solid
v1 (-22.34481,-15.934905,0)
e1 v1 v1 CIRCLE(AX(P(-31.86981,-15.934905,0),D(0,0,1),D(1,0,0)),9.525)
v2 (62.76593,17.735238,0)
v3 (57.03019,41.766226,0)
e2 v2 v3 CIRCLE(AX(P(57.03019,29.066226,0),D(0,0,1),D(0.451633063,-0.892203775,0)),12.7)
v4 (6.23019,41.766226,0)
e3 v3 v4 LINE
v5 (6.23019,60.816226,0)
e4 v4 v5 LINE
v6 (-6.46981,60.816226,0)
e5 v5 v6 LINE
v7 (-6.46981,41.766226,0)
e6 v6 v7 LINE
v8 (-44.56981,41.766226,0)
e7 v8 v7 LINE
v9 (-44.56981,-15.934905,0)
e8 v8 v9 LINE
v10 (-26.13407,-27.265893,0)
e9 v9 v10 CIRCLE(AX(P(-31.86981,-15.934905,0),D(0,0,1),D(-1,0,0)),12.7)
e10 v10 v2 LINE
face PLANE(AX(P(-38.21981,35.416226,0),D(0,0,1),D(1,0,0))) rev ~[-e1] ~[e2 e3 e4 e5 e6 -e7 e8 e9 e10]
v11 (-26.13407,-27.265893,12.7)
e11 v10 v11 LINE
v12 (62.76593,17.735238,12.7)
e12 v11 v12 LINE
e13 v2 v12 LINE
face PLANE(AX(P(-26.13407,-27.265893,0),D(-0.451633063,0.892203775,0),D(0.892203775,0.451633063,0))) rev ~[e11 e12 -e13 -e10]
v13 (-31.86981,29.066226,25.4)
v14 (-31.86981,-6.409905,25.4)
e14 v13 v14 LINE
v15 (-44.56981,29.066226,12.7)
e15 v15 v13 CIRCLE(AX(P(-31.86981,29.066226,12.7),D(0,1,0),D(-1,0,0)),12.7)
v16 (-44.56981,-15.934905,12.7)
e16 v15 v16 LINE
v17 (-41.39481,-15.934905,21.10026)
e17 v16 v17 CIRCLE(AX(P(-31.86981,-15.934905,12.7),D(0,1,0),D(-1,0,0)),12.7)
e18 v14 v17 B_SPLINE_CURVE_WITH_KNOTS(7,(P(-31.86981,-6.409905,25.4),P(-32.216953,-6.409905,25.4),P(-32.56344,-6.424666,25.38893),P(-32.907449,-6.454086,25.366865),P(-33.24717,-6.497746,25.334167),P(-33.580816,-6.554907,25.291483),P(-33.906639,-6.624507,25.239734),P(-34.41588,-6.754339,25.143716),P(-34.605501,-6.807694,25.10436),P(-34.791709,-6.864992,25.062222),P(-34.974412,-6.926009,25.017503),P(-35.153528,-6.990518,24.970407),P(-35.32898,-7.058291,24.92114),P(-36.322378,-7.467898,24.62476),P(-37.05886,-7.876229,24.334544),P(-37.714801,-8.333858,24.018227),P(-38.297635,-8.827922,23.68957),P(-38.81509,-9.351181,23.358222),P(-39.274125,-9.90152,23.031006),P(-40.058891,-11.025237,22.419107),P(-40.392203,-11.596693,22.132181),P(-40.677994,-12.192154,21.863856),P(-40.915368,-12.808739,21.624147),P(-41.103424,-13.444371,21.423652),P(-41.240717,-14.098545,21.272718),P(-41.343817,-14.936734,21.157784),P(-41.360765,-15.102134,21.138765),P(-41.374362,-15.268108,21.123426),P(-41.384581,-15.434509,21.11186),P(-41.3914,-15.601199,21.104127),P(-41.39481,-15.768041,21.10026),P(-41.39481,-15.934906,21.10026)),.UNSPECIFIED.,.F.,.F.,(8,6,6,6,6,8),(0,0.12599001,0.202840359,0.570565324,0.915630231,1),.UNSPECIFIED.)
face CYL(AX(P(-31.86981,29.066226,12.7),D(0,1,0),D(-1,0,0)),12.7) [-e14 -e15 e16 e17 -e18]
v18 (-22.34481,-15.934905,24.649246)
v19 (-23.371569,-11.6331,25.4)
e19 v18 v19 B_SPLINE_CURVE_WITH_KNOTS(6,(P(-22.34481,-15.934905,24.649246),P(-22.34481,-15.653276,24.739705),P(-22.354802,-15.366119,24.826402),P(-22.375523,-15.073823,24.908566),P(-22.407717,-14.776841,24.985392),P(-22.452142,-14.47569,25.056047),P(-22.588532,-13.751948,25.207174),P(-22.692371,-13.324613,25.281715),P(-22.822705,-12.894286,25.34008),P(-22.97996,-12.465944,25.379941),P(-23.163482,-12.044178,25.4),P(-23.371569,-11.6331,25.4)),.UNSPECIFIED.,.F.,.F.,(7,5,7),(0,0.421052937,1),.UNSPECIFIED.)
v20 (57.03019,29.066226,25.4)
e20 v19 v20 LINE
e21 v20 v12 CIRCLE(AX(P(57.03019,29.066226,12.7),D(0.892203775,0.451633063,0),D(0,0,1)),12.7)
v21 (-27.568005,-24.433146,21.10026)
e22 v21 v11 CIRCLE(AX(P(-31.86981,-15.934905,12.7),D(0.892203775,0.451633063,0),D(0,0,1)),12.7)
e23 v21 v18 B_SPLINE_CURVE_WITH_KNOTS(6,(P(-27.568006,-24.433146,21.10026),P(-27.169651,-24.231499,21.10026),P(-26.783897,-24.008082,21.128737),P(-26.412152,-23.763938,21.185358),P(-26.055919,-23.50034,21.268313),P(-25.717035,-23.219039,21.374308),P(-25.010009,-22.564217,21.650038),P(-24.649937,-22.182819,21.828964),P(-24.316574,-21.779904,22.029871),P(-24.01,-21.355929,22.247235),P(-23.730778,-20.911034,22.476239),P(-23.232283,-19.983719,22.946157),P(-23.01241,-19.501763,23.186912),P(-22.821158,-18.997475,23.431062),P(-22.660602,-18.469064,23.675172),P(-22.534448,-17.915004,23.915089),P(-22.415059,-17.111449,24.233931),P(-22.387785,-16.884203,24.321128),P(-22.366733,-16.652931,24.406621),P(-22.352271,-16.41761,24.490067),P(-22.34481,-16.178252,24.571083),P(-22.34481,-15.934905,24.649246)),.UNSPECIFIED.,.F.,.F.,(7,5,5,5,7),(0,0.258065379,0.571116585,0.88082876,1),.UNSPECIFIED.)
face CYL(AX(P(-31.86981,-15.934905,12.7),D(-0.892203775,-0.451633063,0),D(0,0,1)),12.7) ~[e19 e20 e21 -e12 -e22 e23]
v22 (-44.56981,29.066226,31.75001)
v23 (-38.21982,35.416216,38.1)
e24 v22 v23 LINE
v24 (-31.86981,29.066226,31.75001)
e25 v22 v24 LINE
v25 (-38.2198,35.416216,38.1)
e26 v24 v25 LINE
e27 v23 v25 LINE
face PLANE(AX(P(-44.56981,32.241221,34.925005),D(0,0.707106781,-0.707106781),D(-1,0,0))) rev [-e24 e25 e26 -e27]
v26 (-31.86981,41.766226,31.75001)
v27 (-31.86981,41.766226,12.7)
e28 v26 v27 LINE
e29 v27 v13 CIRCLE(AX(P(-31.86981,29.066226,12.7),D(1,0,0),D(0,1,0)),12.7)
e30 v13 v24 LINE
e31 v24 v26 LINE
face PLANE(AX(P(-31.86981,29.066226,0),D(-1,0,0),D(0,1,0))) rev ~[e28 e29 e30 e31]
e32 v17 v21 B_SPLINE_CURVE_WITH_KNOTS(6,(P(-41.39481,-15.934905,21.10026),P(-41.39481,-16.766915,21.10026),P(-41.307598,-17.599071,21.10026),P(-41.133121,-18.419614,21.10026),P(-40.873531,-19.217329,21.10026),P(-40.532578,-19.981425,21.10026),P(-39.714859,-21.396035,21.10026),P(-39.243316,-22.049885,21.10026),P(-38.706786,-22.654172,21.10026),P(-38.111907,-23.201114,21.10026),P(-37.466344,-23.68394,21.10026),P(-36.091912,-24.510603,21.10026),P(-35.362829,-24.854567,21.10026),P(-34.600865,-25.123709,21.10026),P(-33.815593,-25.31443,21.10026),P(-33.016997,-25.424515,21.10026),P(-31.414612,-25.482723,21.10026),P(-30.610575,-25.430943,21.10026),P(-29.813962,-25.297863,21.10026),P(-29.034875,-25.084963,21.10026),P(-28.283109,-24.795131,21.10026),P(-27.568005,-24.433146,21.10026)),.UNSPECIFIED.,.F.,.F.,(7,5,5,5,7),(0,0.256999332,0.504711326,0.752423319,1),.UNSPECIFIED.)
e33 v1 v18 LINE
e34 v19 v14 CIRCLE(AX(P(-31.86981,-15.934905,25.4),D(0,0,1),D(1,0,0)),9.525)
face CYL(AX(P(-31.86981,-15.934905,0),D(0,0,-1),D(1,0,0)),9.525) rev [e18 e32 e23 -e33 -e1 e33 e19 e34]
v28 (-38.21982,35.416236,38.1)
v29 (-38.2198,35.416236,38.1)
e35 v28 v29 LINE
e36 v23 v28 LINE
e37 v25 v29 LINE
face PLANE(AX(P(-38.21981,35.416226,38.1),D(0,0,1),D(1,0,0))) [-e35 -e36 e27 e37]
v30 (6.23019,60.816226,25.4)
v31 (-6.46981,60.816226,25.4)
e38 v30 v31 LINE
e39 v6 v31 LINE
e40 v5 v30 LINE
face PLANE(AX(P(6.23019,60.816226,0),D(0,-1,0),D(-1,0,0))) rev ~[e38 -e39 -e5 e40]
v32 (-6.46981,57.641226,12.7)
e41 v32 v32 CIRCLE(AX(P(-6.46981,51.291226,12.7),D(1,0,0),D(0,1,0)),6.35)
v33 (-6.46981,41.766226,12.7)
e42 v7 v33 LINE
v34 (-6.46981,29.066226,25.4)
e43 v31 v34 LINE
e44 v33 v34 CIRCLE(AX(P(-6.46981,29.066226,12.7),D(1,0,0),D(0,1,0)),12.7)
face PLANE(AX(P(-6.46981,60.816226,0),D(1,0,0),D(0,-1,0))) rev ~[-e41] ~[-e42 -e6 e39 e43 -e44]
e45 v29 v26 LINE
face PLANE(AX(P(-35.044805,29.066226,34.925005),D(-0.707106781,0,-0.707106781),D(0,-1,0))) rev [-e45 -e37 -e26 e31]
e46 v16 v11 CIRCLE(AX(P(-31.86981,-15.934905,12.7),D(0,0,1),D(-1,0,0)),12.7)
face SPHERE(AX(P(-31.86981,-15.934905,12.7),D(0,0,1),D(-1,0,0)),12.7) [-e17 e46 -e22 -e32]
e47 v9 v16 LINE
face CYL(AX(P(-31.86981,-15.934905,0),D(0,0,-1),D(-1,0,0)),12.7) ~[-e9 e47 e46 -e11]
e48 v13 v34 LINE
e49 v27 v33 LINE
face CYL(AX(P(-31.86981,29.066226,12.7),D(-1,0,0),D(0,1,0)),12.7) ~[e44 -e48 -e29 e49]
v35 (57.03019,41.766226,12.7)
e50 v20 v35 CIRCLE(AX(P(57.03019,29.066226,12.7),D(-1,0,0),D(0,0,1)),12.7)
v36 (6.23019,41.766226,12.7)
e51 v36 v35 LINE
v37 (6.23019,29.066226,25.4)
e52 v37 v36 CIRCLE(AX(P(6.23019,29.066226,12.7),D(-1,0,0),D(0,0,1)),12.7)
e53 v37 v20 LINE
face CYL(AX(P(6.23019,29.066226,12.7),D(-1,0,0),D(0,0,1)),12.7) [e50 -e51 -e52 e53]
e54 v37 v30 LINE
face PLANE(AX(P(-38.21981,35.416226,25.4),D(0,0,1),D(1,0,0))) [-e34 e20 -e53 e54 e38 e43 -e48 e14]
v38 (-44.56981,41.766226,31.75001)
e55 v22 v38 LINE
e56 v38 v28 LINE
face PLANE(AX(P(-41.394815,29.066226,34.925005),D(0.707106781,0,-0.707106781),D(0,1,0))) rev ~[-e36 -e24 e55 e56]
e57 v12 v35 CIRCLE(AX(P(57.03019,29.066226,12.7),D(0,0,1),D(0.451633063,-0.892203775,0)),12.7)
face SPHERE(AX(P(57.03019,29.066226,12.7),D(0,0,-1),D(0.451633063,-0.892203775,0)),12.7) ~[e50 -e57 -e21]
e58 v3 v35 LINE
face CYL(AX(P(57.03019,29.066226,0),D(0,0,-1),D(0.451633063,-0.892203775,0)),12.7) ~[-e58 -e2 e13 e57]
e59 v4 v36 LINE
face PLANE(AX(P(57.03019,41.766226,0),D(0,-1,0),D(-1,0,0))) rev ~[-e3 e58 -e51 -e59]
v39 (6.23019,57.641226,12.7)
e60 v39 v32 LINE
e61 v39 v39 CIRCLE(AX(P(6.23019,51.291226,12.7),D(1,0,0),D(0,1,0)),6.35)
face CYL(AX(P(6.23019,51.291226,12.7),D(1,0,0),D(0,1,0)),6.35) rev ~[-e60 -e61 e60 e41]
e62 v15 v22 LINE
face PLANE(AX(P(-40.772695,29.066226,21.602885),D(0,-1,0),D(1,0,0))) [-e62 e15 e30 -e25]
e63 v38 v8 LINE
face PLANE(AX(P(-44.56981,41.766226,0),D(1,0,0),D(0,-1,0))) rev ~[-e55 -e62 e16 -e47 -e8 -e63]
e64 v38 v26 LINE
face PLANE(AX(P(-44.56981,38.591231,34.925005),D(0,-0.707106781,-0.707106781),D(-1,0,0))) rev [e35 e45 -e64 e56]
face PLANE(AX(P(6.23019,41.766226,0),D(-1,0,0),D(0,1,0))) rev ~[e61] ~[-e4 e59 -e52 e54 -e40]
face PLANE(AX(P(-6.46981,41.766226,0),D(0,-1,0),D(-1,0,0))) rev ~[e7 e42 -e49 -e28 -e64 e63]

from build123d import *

# Parameters (mm, degrees)
F0_W         = 12.7
F0_H         = 12.7
F0_R         = 9.525
F1_DEPTH     = 25.4
F2_DEPTH     = 38.1
F3_SIZE      = 6.34999
F4_T1_DEPTH  = 50.8
F4_T3_DEPTH  = 99.6409143921
F4_T5_DEPTH  = 25.4
F4_T7_DEPTH  = 45.0011313289
F4_T10_ANGLE = 153.1514920802
F4_T12_ANGLE = 116.8485079198
F5_R         = 6.35
F6_DEPTH     = 50.8010001


# Not quite as in the source:
# - a fillet or chamfer that OpenCascade refuses, or shapes differently, is made with other operations: its cross-section is extruded or revolved along the edge and cut away or added
# - a fillet or chamfer is up to 0.001 mm smaller than in the source, because OpenCascade refuses the exact size


with BuildPart() as f1:
    # F0 (on Top) → F1 (new body)
    with BuildSketch(Plane.XY):
        with Locations((-38.2198102176, 35.4162262917)):
            Rectangle(F0_W, F0_H)
        with BuildLine():
            Line((-6.4698102176, 41.7662262917), (-31.8698102176, 41.7662262917))
            Line((-31.8698102176, 41.7662262917), (-31.8698102176, 29.0662262917))
            Line((-31.8698102176, 29.0662262917), (-44.5698102176, 29.0662262917))
            Line((-44.5698102176, 29.0662262917), (-44.5698102176, -15.9349050373))
            ThreePointArc((-44.5698102176, -15.9349050373), (-31.8698102176, -3.2349050373), (-19.1698102176, -15.9349050373))
            ThreePointArc((-19.1698102176, -15.9349050373), (-21.0500621459, -22.5849465157), (-26.1340703224, -27.2658929842))
            Line((-26.1340703224, -27.2658929842), (62.7659296776, 17.7352383447))
            ThreePointArc((62.7659296776, 17.7352383447), (69.3831964392, 32.0146540993), (57.0301897824, 41.7662262917))
            Line((57.0301897824, 41.7662262917), (6.2301897824, 41.7662262917))
            Line((6.2301897824, 41.7662262917), (6.2301897824, 60.8162262917))
            Line((6.2301897824, 60.8162262917), (-6.4698102176, 60.8162262917))
            Line((-6.4698102176, 60.8162262917), (-6.4698102176, 41.7662262917))
        make_face()
        with BuildLine():
            ThreePointArc((-19.1698102176, -15.9349050373), (-31.8698102176, -3.2349050373), (-44.5698102176, -15.9349050373))
            ThreePointArc((-44.5698102176, -15.9349050373), (-38.5198516961, -26.754653109), (-26.1340703224, -27.2658929842))
            ThreePointArc((-26.1340703224, -27.2658929842), (-21.0500621459, -22.5849465157), (-19.1698102176, -15.9349050373))
        make_face()
        with Locations((-31.8698102176, -15.9349050373)):
            Circle(F0_R, mode=Mode.SUBTRACT)
    extrude(amount=F1_DEPTH)

    # F0 (on Top) → F2 (join)
    with BuildSketch(Plane.XY):
        with Locations((-38.2198102176, 35.4162262917)):
            Rectangle(F0_W, F0_H)
    extrude(amount=F2_DEPTH)

    # F3 (size 6.35 in the source; OpenCascade refuses exactly that, so slightly less here)
    f3_edges = [f1.edges().sort_by_distance(p)[0] for p in [
        (-38.21981, 29.066226, 38.1),
        (-44.56981, 35.416226, 38.1),
        (-38.21981, 41.766226, 38.1),
        (-31.86981, 35.416226, 38.1),
    ]]
    chamfer(f3_edges, length=F3_SIZE)

    # F4: fillet of radius 12.7 on 6 edges, made by hand

    # F4_s2 → F4_t1 (cut)
    with BuildSketch(Plane.YZ.offset(6.2301897824)):
        with BuildLine():
            ThreePointArc((29.0662262917, 25.4), (38.0464824127, 21.6802561211), (41.7662262917, 12.7))
            Line((41.7662262917, 12.7), (42.0202262917, 12.7))
            Line((42.0202262917, 12.7), (42.0202262917, 25.654))
            Line((42.0202262917, 25.654), (29.0662262917, 25.654))
            Line((29.0662262917, 25.654), (29.0662262917, 25.4))
        make_face()
    extrude(amount=F4_T1_DEPTH, mode=Mode.SUBTRACT)

    # F4_s4 → F4_t3 (cut)
    with BuildSketch(Plane(origin=(-31.7901974435, -16.0921805414, 0), x_dir=(0, 0, 1), z_dir=(0.8922037754, 0.4516330626, 0))):
        with BuildLine():
            ThreePointArc((25.4, -0.1762775595), (21.6802561211, 8.8039785616), (12.7, 12.5237224405))
            Line((12.7, 12.5237224405), (12.7, 12.7777224405))
            Line((12.7, 12.7777224405), (25.654, 12.7777224405))
            Line((25.654, 12.7777224405), (25.654, -0.1762775595))
            Line((25.654, -0.1762775595), (25.4, -0.1762775595))
        make_face()
    extrude(amount=F4_T3_DEPTH, mode=Mode.SUBTRACT)

    # F4_s6 → F4_t5 (cut)
    with BuildSketch(Plane.YZ.offset(-31.8698102176)):
        with BuildLine():
            ThreePointArc((41.7662262917, 12.7), (38.0464824127, 21.6802561211), (29.0662262917, 25.4))
            Line((29.0662262917, 25.4), (29.0662262917, 25.654))
            Line((29.0662262917, 25.654), (42.0202262917, 25.654))
            Line((42.0202262917, 25.654), (42.0202262917, 12.7))
            Line((42.0202262917, 12.7), (41.7662262917, 12.7))
        make_face()
    extrude(amount=F4_T5_DEPTH, mode=Mode.SUBTRACT)

    # F4_s8 → F4_t7 (cut)
    with BuildSketch(Plane.XZ.offset(-29.0662262917)):
        with BuildLine():
            ThreePointArc((-44.5698102176, 12.7), (-40.8500663387, 21.6802561211), (-31.8698102176, 25.4))
            Line((-31.8698102176, 25.4), (-31.8698102176, 25.654))
            Line((-31.8698102176, 25.654), (-44.8238102176, 25.654))
            Line((-44.8238102176, 25.654), (-44.8238102176, 12.7))
            Line((-44.8238102176, 12.7), (-44.5698102176, 12.7))
        make_face()
    extrude(amount=F4_T7_DEPTH, mode=Mode.SUBTRACT)

    # F4_s9 → F4_t10 (revolve, cut)
    with BuildSketch(Plane(origin=(57.1098025565, 28.9089507875, 0), x_dir=(0, 0, 1), z_dir=(-0.8922037754, -0.4516330626, 0))):
        with BuildLine():
            ThreePointArc((25.4, 0.1762775595), (21.6802561211, -8.8039785616), (12.7, -12.5237224405))
            Line((12.7, -12.5237224405), (12.7, -12.7777224405))
            Line((12.7, -12.7777224405), (25.654, -12.7777224405))
            Line((25.654, -12.7777224405), (25.654, 0.1762775595))
            Line((25.654, 0.1762775595), (25.4, 0.1762775595))
        make_face()
    revolve(axis=Axis((57.0301897824, 29.0662262917, 25.4), (0, 0, 1)), revolution_arc=F4_T10_ANGLE, mode=Mode.SUBTRACT)

    # F4_s11 → F4_t12 (revolve, cut)
    with BuildSketch(Plane.XZ.offset(15.9349050373)):
        with BuildLine():
            ThreePointArc((-44.5698102176, 12.7), (-40.8500663387, 21.6802561211), (-31.8698102176, 25.4))
            Line((-31.8698102176, 25.4), (-31.8698102176, 25.654))
            Line((-31.8698102176, 25.654), (-44.8238102176, 25.654))
            Line((-44.8238102176, 25.654), (-44.8238102176, 12.7))
            Line((-44.8238102176, 12.7), (-44.5698102176, 12.7))
        make_face()
    revolve(axis=Axis((-31.8698102176, -15.9349050373, 25.4), (0, 0, 1)), revolution_arc=F4_T12_ANGLE, mode=Mode.SUBTRACT)

    # F5 (on face) → F6 (cut, through all)
    with BuildSketch(Plane.YZ.offset(6.2301897824)):
        with Locations((51.2912262917, 12.7)):
            Circle(F5_R)
    extrude(amount=-F6_DEPTH, mode=Mode.SUBTRACT)


solid = f1.part
